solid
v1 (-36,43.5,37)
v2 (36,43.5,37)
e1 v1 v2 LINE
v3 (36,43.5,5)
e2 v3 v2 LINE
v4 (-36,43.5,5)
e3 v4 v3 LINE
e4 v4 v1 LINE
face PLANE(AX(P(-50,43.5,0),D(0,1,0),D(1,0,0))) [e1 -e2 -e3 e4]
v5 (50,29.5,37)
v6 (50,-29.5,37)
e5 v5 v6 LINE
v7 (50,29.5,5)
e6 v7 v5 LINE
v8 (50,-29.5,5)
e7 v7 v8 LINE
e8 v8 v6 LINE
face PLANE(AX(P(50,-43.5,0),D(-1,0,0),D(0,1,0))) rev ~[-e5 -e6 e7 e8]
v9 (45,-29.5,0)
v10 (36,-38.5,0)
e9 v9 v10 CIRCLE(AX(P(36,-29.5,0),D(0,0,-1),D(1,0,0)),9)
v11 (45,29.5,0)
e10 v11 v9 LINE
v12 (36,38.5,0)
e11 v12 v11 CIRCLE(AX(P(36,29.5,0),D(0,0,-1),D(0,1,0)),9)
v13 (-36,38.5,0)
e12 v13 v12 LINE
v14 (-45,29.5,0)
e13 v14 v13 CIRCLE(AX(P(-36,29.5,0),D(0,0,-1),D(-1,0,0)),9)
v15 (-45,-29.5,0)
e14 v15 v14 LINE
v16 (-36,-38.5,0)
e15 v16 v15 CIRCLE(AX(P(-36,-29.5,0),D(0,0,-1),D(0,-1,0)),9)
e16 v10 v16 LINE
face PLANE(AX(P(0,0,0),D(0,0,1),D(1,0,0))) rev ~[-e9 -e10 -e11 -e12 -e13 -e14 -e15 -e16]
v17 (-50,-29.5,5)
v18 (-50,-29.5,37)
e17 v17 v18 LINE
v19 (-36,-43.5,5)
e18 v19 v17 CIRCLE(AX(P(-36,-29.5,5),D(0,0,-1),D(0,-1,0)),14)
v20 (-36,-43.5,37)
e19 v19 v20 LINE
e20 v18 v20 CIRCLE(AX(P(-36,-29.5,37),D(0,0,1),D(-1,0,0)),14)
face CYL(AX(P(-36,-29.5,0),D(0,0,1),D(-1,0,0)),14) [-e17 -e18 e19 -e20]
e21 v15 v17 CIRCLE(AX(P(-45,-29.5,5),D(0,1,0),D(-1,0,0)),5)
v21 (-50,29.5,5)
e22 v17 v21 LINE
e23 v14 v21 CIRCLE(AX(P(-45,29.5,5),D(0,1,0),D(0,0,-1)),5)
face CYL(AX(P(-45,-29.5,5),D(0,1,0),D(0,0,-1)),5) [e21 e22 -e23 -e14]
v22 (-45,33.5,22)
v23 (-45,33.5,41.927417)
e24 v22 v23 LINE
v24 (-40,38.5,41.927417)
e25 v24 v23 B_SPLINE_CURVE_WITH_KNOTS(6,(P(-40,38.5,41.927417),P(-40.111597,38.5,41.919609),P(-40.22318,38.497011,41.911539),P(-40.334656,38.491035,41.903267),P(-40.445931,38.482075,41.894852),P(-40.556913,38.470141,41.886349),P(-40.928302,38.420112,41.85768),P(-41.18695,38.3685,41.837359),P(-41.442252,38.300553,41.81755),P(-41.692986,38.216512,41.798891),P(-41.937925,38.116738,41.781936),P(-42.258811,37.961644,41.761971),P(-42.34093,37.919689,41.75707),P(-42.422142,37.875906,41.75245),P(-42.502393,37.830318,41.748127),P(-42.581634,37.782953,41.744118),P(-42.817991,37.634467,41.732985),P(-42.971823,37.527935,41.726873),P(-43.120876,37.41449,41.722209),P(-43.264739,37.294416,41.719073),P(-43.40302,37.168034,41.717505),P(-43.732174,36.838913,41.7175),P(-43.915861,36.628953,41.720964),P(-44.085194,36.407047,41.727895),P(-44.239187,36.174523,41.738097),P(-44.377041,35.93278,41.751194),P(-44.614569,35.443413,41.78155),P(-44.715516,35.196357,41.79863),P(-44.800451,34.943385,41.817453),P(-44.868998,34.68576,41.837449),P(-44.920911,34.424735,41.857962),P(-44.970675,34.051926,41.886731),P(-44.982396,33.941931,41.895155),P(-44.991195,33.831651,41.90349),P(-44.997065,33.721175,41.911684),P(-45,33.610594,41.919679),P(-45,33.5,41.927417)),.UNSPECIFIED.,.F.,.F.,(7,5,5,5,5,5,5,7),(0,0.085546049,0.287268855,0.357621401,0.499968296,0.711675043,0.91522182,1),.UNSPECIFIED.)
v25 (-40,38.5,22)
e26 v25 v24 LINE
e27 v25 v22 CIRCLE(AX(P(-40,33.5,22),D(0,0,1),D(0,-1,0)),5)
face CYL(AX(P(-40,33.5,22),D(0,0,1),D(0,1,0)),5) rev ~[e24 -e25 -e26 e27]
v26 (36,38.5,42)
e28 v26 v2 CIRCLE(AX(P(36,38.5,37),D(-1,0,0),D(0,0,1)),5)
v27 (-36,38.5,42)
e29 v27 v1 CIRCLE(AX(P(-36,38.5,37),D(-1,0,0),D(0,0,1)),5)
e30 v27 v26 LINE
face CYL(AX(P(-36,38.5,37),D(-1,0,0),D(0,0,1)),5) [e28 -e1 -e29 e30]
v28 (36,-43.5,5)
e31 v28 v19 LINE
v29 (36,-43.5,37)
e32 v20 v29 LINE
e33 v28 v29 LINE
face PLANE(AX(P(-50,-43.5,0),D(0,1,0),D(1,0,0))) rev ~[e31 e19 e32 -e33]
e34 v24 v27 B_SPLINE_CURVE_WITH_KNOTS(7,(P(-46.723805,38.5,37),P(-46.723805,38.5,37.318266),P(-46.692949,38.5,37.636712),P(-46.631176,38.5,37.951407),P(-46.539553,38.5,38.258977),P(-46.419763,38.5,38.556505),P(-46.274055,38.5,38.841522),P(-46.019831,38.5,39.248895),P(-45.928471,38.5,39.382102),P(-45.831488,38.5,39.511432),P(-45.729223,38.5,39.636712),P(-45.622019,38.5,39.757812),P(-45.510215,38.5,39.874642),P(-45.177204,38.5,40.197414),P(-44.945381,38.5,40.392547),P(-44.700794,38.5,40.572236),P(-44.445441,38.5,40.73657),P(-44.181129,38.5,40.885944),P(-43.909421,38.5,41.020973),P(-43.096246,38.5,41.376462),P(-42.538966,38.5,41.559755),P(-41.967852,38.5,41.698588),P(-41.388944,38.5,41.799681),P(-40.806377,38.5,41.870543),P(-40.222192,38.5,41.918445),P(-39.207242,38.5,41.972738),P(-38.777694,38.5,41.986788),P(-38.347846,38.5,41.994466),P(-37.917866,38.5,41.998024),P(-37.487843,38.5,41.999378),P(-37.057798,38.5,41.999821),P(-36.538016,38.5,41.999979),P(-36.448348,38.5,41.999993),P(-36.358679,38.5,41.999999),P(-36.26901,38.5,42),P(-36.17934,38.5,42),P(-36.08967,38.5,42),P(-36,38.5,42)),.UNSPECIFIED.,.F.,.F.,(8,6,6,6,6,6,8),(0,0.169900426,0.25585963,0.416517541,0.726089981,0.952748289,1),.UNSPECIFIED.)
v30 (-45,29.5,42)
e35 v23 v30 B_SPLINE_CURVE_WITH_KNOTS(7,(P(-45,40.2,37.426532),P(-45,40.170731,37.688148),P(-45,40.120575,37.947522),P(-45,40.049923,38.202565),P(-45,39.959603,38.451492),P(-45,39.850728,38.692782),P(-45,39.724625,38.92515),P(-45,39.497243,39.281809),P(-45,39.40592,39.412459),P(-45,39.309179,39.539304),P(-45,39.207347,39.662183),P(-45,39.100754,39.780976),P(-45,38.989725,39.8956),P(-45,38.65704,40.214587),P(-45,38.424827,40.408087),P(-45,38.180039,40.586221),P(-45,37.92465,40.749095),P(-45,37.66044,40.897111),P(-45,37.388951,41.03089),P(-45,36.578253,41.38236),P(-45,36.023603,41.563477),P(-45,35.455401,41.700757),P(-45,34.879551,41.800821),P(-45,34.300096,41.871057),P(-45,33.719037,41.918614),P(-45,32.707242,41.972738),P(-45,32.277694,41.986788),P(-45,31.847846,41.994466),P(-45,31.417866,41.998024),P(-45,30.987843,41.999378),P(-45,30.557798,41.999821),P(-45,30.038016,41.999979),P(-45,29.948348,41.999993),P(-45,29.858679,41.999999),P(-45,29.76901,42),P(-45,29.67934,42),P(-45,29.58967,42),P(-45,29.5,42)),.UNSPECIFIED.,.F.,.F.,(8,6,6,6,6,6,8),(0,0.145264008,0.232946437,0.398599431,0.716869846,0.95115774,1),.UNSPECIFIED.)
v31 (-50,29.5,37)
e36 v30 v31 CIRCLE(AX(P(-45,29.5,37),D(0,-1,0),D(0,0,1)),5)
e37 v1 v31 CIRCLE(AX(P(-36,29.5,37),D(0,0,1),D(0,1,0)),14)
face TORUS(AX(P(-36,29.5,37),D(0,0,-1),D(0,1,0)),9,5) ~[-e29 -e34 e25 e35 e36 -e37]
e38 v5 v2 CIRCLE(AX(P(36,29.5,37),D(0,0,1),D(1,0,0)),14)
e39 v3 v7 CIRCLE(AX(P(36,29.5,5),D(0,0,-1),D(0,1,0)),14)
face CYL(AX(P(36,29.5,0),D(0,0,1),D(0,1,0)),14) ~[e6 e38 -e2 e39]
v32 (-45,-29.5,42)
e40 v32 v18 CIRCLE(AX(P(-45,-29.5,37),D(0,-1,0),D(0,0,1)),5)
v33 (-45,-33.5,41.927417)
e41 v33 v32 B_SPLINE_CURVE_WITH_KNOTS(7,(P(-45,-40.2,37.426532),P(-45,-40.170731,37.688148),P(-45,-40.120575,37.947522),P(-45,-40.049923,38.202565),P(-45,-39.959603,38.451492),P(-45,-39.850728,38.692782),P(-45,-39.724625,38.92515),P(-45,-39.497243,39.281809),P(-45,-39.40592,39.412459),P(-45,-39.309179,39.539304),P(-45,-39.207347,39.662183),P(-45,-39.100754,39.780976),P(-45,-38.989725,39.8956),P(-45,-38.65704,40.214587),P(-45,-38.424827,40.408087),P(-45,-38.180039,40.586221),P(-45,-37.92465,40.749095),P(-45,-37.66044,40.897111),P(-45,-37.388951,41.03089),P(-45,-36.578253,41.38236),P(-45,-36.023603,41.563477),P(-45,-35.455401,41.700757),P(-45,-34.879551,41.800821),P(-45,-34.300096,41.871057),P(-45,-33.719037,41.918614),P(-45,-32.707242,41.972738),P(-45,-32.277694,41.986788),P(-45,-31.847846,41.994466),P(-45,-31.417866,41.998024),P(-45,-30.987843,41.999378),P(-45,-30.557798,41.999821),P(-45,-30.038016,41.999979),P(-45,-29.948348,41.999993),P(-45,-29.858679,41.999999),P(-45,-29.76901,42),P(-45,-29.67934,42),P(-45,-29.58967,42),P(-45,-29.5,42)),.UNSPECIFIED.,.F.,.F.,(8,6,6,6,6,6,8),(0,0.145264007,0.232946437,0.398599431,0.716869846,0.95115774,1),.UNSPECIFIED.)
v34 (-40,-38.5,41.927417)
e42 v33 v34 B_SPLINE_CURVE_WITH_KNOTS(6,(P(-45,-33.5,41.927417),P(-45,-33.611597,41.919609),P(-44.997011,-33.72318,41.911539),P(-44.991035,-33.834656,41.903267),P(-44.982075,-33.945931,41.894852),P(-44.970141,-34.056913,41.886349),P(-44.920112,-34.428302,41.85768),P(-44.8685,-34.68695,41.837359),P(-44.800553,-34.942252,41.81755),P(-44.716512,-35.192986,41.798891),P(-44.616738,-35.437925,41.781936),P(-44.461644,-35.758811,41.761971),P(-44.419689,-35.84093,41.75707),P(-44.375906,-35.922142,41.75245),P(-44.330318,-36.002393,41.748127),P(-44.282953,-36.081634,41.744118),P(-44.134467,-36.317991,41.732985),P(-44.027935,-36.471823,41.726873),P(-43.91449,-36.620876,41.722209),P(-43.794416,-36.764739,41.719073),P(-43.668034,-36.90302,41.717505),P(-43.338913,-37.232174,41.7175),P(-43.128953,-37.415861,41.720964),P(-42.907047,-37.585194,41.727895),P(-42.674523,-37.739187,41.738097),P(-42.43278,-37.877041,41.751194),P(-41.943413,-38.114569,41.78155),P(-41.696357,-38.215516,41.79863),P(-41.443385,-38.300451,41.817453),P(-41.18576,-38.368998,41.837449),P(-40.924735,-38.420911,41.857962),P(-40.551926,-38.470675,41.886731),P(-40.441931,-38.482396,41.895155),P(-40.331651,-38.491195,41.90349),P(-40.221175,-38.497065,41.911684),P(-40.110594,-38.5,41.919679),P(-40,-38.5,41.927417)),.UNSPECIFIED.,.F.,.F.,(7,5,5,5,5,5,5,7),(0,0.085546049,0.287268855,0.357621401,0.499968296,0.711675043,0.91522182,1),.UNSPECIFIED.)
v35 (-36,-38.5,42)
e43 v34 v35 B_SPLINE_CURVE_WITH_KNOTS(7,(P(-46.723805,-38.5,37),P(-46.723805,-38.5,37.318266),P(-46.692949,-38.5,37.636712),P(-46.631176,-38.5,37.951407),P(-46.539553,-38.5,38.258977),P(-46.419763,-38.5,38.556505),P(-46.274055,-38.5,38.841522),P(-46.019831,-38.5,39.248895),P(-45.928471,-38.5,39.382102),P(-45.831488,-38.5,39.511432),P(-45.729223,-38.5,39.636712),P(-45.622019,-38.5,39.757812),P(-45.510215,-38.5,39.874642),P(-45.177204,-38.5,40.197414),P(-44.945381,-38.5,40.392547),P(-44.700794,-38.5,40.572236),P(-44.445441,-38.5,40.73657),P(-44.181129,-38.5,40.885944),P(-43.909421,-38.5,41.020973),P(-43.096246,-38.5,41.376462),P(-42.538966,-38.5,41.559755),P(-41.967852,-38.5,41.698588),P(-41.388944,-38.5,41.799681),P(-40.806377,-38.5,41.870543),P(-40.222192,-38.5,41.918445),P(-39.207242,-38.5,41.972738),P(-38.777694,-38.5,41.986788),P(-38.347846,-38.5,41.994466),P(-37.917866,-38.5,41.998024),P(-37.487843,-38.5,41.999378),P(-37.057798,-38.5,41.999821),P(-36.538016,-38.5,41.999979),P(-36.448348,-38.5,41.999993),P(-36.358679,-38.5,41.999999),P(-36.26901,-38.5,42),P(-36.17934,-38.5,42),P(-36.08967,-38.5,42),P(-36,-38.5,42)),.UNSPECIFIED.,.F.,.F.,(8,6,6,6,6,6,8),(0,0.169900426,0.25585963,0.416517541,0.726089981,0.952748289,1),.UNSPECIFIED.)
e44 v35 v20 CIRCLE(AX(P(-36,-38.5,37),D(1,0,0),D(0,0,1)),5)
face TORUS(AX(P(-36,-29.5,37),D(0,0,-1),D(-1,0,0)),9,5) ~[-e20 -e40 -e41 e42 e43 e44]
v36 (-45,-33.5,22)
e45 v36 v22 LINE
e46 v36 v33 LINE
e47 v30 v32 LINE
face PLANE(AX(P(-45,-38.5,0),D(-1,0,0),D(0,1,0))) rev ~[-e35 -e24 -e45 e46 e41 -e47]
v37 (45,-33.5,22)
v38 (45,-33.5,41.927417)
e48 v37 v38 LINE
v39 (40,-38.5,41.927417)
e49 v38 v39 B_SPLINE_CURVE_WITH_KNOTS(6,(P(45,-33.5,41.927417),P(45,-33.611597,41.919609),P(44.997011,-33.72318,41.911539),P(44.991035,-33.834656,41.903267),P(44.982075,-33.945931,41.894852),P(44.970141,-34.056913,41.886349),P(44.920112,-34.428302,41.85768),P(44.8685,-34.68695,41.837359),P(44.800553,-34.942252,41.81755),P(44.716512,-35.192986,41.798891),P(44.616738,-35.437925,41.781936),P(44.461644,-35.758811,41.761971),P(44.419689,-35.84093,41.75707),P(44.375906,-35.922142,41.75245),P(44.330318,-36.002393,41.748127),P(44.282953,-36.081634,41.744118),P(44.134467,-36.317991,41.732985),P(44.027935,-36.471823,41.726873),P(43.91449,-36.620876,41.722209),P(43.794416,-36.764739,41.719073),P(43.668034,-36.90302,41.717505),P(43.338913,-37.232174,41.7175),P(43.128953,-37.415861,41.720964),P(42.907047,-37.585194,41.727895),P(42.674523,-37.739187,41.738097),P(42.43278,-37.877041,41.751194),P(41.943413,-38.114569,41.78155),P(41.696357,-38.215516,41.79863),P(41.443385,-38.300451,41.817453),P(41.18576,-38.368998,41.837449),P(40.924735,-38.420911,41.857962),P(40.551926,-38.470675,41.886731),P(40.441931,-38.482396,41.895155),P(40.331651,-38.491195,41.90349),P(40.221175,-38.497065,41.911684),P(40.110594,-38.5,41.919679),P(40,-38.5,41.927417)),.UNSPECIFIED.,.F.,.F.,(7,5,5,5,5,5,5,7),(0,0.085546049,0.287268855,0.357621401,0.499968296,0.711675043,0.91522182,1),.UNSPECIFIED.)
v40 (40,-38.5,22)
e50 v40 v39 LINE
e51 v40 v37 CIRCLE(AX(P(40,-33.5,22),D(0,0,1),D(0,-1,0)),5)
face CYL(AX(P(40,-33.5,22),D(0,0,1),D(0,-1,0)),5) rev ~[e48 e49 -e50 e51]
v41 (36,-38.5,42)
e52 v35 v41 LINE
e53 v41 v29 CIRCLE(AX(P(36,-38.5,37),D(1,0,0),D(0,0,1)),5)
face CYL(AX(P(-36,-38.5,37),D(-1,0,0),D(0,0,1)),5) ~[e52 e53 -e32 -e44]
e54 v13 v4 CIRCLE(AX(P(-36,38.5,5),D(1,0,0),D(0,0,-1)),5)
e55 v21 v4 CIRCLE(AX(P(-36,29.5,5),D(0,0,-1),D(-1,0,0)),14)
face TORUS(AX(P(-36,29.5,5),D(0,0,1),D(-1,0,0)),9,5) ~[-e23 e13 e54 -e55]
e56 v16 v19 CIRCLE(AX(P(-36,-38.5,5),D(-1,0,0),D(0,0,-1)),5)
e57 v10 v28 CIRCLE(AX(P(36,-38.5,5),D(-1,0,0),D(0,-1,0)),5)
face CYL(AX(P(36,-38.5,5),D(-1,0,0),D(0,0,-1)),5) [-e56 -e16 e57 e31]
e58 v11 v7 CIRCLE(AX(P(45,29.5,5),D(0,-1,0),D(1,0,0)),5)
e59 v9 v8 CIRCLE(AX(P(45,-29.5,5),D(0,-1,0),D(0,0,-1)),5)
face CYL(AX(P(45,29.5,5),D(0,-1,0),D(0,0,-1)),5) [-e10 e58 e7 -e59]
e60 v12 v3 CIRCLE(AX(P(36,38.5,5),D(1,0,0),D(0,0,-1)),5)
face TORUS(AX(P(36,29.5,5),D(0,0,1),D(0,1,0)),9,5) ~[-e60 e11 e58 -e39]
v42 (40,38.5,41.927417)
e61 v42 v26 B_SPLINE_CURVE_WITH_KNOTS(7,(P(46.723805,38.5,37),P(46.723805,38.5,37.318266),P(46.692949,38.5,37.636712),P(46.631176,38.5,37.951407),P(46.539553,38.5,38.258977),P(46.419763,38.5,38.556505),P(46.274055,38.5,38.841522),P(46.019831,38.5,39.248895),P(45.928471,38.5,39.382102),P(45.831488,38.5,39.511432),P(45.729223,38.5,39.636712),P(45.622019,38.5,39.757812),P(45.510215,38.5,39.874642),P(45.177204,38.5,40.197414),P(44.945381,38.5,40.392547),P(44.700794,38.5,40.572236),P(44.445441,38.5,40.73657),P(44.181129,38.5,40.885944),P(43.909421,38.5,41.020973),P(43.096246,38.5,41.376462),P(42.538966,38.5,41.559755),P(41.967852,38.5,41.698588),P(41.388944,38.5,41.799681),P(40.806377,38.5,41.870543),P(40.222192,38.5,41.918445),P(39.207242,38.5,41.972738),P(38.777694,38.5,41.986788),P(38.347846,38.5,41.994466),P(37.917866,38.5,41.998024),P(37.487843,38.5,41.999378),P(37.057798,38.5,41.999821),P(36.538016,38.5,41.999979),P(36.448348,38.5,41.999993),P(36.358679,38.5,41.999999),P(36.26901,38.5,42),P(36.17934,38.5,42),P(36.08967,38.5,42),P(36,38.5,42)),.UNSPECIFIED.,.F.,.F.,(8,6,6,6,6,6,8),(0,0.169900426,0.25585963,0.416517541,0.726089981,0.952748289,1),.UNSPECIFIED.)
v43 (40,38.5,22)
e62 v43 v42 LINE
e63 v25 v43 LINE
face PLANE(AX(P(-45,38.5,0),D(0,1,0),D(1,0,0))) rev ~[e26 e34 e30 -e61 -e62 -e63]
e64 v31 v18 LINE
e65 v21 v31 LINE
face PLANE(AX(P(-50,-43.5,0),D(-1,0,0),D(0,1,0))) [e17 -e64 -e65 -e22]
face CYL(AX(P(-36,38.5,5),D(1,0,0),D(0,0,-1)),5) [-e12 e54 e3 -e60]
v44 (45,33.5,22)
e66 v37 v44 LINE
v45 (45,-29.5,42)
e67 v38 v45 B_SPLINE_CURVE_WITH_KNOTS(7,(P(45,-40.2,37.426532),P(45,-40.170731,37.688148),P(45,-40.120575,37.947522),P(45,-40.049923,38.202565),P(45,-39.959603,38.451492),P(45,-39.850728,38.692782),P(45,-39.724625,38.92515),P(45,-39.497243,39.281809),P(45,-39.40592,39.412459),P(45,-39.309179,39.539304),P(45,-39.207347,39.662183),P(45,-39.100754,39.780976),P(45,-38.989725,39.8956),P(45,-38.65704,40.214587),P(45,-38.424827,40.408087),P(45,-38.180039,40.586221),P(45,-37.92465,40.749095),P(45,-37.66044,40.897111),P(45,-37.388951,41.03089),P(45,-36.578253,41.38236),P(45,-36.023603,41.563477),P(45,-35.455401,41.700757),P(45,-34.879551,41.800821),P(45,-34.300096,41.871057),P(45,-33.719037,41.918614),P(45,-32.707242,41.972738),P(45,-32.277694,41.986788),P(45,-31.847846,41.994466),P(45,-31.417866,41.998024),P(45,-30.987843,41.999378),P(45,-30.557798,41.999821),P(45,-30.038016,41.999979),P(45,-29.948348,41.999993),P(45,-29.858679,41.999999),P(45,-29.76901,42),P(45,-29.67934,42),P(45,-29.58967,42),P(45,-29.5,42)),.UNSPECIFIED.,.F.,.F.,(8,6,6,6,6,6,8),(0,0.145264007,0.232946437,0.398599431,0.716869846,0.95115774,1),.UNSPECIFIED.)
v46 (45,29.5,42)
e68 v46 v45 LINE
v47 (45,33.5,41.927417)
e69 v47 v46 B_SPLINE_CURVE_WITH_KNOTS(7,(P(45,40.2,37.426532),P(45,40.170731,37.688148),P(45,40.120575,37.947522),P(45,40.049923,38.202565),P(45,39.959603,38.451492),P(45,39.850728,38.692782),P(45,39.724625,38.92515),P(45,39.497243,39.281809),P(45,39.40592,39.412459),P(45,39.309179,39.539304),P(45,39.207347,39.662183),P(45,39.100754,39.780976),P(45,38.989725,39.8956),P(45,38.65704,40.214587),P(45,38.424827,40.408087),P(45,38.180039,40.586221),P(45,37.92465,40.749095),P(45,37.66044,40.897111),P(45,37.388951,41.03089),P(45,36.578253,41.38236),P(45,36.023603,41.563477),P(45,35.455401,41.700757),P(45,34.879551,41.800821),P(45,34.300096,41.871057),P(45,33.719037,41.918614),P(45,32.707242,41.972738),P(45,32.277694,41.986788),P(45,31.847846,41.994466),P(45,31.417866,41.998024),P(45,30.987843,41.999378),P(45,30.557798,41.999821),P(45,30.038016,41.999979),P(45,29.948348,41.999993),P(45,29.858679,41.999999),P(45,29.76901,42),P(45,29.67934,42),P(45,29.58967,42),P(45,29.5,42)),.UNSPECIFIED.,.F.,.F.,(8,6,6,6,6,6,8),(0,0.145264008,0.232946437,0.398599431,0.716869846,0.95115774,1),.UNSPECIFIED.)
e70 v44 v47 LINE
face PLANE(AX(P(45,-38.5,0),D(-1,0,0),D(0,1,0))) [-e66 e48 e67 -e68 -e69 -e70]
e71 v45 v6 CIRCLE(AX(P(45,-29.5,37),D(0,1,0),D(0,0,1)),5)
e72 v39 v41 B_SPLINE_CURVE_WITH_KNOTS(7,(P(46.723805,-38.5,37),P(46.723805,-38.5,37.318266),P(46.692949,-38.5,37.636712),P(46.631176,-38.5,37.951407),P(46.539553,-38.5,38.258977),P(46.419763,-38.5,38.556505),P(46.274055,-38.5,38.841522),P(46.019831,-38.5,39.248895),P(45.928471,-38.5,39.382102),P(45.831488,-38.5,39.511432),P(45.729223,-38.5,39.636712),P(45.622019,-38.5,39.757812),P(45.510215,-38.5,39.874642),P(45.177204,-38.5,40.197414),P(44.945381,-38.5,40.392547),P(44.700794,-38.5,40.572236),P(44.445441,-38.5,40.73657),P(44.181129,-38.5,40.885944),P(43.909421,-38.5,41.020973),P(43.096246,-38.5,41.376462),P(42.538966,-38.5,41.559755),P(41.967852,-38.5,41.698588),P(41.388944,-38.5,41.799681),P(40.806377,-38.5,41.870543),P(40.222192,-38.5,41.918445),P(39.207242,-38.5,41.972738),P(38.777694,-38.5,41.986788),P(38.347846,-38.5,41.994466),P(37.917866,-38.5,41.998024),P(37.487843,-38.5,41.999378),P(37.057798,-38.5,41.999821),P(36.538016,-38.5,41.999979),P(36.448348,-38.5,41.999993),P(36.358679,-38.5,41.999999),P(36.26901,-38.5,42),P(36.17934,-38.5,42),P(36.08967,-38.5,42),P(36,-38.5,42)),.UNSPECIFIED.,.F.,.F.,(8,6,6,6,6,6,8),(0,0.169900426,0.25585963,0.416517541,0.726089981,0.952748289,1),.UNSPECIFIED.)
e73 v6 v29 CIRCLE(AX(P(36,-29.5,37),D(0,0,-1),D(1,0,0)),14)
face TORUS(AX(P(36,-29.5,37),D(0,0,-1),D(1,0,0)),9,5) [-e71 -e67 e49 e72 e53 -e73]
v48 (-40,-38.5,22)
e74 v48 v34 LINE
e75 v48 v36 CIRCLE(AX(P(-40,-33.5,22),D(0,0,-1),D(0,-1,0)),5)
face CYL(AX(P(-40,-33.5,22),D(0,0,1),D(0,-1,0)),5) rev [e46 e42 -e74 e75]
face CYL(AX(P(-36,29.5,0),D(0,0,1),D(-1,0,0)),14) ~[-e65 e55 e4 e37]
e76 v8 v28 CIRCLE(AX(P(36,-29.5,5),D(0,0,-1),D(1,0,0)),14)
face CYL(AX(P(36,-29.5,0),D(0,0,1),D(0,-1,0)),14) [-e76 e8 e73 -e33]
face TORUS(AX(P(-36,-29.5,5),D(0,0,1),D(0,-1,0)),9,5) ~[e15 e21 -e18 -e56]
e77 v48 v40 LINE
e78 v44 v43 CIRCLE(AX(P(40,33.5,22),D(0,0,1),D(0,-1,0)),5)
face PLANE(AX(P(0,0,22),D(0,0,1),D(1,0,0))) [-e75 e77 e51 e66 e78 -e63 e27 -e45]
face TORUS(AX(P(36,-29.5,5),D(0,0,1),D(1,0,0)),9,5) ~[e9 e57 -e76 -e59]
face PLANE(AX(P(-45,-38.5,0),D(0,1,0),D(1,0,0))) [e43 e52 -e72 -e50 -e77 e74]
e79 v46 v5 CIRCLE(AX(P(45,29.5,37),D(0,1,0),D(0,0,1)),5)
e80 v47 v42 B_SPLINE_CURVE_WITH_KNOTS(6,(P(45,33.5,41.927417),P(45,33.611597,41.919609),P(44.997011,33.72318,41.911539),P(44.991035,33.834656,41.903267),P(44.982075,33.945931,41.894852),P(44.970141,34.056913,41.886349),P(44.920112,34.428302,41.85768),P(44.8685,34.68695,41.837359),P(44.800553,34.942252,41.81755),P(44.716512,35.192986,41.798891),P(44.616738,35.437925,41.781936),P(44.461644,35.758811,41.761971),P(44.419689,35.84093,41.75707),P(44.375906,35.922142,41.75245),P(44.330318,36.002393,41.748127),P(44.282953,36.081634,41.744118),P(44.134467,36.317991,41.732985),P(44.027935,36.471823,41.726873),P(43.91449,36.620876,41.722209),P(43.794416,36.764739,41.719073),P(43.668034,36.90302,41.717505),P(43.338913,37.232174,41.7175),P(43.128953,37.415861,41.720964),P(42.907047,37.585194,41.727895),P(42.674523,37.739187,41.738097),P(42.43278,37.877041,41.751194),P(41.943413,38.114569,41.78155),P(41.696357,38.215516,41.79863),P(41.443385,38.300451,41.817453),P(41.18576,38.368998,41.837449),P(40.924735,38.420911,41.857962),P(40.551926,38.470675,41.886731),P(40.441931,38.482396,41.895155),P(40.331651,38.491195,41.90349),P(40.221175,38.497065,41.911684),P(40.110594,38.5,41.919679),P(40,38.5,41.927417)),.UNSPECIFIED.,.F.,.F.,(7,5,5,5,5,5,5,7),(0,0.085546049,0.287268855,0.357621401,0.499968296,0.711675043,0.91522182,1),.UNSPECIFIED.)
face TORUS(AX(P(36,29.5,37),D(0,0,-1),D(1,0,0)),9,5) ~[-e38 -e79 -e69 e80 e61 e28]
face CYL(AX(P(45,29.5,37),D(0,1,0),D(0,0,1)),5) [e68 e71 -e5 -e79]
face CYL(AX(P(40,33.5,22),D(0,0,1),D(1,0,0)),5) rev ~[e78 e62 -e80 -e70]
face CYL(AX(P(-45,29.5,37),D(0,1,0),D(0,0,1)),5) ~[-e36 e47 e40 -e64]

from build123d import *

# Parameters (mm, degrees)
F0_W         = 90
F0_H         = 77
F1_DEPTH     = 22
F0_W_2       = 100
F0_H_2       = 87
F2_DEPTH     = 42
F3_R         = 14
F4_R         = 5
F5_R         = 5
F6_T1_DEPTH  = 72
F6_T3_DEPTH  = 59
F6_T6_ANGLE  = 90
F6_T8_ANGLE  = 90
F6_T10_ANGLE = 90
F6_T12_ANGLE = 90


# Not quite as in the source:
# - a fillet or chamfer that OpenCascade refuses, or shapes differently, is made with other operations: its cross-section is extruded or revolved along the edge and cut away or added


with BuildPart() as f1:
    # F0 (on Top) → F1 (new body)
    with BuildSketch(Plane.XY):
        Rectangle(F0_W, F0_H)
    extrude(amount=F1_DEPTH)

    # F0 (on Top) → F2 (join)
    with BuildSketch(Plane.XY):
        Rectangle(F0_W_2, F0_H_2)
        Rectangle(F0_W, F0_H, mode=Mode.SUBTRACT)
    extrude(amount=F2_DEPTH)

    # F3
    f3_edges = [f1.edges().sort_by_distance(p)[0] for p in [
        (-50, -43.5, 21),
        (-50, 43.5, 21),
        (50, 43.5, 21),
        (50, -43.5, 21),
    ]]
    fillet(f3_edges, radius=F3_R)

    # F4
    f4_edges = [f1.edges().sort_by_distance(p)[0] for p in [
        (0, 43.5, 0),
    ]]
    fillet(f4_edges, radius=F4_R)

    # F5
    f5_edges = [f1.edges().sort_by_distance(p)[0] for p in [
        (-45, -38.5, 32),
        (45, -38.5, 32),
        (-45, 38.5, 32),
        (45, 38.5, 32),
    ]]
    fillet(f5_edges, radius=F5_R)

    # F6: fillet of radius 5 on 8 edges, made by hand

    # F6_s2 → F6_t1 (cut)
    with BuildSketch(Plane.YZ.offset(-36)):
        with BuildLine():
            ThreePointArc((-38.5, 42), (-42.0355339059, 40.5355339059), (-43.5, 37))
            Line((-43.5, 37), (-43.5, 42))
            Line((-43.5, 42), (-38.5, 42))
        make_face()
        with BuildLine():
            ThreePointArc((38.5, 42), (42.0355339059, 40.5355339059), (43.5, 37))
            Line((43.5, 37), (43.5, 42))
            Line((43.5, 42), (38.5, 42))
        make_face()
    extrude(amount=F6_T1_DEPTH, mode=Mode.SUBTRACT)

    # F6_s4 → F6_t3 (cut)
    with BuildSketch(Plane.XZ.offset(-29.5)):
        with BuildLine():
            ThreePointArc((45, 42), (48.5355339059, 40.5355339059), (50, 37))
            Line((50, 37), (50, 42))
            Line((50, 42), (45, 42))
        make_face()
        with BuildLine():
            ThreePointArc((-45, 42), (-48.5355339059, 40.5355339059), (-50, 37))
            Line((-50, 37), (-50, 42))
            Line((-50, 42), (-45, 42))
        make_face()
    extrude(amount=F6_T3_DEPTH, mode=Mode.SUBTRACT)

    # F6_s5 → F6_t6 (revolve, cut)
    with BuildSketch(Plane.XZ.offset(29.5)):
        with BuildLine():
            ThreePointArc((45, 42), (48.5355339059, 40.5355339059), (50, 37))
            Line((50, 37), (50, 42))
            Line((50, 42), (45, 42))
        make_face()
    revolve(axis=Axis((36, -29.5, 42), (0, 0, -1)), revolution_arc=F6_T6_ANGLE, mode=Mode.SUBTRACT)

    # F6_s7 → F6_t8 (revolve, cut)
    with BuildSketch(Plane.XZ.offset(-29.5)):
        with BuildLine():
            ThreePointArc((45, 42), (48.5355339059, 40.5355339059), (50, 37))
            Line((50, 37), (50, 42))
            Line((50, 42), (45, 42))
        make_face()
    revolve(axis=Axis((36, 29.5, 42), (0, 0, 1)), revolution_arc=F6_T8_ANGLE, mode=Mode.SUBTRACT)

    # F6_s9 → F6_t10 (revolve, cut)
    with BuildSketch(Plane.XZ.offset(29.5)):
        with BuildLine():
            ThreePointArc((-45, 42), (-48.5355339059, 40.5355339059), (-50, 37))
            Line((-50, 37), (-50, 42))
            Line((-50, 42), (-45, 42))
        make_face()
    revolve(axis=Axis((-36, -29.5, 42), (0, 0, 1)), revolution_arc=F6_T10_ANGLE, mode=Mode.SUBTRACT)

    # F6_s11 → F6_t12 (revolve, cut)
    with BuildSketch(Plane.YZ.offset(-36)):
        with BuildLine():
            ThreePointArc((38.5, 42), (42.0355339059, 40.5355339059), (43.5, 37))
            Line((43.5, 37), (43.5, 42))
            Line((43.5, 42), (38.5, 42))
        make_face()
    revolve(axis=Axis((-36, 29.5, 42), (0, 0, 1)), revolution_arc=F6_T12_ANGLE, mode=Mode.SUBTRACT)


solid = f1.part
